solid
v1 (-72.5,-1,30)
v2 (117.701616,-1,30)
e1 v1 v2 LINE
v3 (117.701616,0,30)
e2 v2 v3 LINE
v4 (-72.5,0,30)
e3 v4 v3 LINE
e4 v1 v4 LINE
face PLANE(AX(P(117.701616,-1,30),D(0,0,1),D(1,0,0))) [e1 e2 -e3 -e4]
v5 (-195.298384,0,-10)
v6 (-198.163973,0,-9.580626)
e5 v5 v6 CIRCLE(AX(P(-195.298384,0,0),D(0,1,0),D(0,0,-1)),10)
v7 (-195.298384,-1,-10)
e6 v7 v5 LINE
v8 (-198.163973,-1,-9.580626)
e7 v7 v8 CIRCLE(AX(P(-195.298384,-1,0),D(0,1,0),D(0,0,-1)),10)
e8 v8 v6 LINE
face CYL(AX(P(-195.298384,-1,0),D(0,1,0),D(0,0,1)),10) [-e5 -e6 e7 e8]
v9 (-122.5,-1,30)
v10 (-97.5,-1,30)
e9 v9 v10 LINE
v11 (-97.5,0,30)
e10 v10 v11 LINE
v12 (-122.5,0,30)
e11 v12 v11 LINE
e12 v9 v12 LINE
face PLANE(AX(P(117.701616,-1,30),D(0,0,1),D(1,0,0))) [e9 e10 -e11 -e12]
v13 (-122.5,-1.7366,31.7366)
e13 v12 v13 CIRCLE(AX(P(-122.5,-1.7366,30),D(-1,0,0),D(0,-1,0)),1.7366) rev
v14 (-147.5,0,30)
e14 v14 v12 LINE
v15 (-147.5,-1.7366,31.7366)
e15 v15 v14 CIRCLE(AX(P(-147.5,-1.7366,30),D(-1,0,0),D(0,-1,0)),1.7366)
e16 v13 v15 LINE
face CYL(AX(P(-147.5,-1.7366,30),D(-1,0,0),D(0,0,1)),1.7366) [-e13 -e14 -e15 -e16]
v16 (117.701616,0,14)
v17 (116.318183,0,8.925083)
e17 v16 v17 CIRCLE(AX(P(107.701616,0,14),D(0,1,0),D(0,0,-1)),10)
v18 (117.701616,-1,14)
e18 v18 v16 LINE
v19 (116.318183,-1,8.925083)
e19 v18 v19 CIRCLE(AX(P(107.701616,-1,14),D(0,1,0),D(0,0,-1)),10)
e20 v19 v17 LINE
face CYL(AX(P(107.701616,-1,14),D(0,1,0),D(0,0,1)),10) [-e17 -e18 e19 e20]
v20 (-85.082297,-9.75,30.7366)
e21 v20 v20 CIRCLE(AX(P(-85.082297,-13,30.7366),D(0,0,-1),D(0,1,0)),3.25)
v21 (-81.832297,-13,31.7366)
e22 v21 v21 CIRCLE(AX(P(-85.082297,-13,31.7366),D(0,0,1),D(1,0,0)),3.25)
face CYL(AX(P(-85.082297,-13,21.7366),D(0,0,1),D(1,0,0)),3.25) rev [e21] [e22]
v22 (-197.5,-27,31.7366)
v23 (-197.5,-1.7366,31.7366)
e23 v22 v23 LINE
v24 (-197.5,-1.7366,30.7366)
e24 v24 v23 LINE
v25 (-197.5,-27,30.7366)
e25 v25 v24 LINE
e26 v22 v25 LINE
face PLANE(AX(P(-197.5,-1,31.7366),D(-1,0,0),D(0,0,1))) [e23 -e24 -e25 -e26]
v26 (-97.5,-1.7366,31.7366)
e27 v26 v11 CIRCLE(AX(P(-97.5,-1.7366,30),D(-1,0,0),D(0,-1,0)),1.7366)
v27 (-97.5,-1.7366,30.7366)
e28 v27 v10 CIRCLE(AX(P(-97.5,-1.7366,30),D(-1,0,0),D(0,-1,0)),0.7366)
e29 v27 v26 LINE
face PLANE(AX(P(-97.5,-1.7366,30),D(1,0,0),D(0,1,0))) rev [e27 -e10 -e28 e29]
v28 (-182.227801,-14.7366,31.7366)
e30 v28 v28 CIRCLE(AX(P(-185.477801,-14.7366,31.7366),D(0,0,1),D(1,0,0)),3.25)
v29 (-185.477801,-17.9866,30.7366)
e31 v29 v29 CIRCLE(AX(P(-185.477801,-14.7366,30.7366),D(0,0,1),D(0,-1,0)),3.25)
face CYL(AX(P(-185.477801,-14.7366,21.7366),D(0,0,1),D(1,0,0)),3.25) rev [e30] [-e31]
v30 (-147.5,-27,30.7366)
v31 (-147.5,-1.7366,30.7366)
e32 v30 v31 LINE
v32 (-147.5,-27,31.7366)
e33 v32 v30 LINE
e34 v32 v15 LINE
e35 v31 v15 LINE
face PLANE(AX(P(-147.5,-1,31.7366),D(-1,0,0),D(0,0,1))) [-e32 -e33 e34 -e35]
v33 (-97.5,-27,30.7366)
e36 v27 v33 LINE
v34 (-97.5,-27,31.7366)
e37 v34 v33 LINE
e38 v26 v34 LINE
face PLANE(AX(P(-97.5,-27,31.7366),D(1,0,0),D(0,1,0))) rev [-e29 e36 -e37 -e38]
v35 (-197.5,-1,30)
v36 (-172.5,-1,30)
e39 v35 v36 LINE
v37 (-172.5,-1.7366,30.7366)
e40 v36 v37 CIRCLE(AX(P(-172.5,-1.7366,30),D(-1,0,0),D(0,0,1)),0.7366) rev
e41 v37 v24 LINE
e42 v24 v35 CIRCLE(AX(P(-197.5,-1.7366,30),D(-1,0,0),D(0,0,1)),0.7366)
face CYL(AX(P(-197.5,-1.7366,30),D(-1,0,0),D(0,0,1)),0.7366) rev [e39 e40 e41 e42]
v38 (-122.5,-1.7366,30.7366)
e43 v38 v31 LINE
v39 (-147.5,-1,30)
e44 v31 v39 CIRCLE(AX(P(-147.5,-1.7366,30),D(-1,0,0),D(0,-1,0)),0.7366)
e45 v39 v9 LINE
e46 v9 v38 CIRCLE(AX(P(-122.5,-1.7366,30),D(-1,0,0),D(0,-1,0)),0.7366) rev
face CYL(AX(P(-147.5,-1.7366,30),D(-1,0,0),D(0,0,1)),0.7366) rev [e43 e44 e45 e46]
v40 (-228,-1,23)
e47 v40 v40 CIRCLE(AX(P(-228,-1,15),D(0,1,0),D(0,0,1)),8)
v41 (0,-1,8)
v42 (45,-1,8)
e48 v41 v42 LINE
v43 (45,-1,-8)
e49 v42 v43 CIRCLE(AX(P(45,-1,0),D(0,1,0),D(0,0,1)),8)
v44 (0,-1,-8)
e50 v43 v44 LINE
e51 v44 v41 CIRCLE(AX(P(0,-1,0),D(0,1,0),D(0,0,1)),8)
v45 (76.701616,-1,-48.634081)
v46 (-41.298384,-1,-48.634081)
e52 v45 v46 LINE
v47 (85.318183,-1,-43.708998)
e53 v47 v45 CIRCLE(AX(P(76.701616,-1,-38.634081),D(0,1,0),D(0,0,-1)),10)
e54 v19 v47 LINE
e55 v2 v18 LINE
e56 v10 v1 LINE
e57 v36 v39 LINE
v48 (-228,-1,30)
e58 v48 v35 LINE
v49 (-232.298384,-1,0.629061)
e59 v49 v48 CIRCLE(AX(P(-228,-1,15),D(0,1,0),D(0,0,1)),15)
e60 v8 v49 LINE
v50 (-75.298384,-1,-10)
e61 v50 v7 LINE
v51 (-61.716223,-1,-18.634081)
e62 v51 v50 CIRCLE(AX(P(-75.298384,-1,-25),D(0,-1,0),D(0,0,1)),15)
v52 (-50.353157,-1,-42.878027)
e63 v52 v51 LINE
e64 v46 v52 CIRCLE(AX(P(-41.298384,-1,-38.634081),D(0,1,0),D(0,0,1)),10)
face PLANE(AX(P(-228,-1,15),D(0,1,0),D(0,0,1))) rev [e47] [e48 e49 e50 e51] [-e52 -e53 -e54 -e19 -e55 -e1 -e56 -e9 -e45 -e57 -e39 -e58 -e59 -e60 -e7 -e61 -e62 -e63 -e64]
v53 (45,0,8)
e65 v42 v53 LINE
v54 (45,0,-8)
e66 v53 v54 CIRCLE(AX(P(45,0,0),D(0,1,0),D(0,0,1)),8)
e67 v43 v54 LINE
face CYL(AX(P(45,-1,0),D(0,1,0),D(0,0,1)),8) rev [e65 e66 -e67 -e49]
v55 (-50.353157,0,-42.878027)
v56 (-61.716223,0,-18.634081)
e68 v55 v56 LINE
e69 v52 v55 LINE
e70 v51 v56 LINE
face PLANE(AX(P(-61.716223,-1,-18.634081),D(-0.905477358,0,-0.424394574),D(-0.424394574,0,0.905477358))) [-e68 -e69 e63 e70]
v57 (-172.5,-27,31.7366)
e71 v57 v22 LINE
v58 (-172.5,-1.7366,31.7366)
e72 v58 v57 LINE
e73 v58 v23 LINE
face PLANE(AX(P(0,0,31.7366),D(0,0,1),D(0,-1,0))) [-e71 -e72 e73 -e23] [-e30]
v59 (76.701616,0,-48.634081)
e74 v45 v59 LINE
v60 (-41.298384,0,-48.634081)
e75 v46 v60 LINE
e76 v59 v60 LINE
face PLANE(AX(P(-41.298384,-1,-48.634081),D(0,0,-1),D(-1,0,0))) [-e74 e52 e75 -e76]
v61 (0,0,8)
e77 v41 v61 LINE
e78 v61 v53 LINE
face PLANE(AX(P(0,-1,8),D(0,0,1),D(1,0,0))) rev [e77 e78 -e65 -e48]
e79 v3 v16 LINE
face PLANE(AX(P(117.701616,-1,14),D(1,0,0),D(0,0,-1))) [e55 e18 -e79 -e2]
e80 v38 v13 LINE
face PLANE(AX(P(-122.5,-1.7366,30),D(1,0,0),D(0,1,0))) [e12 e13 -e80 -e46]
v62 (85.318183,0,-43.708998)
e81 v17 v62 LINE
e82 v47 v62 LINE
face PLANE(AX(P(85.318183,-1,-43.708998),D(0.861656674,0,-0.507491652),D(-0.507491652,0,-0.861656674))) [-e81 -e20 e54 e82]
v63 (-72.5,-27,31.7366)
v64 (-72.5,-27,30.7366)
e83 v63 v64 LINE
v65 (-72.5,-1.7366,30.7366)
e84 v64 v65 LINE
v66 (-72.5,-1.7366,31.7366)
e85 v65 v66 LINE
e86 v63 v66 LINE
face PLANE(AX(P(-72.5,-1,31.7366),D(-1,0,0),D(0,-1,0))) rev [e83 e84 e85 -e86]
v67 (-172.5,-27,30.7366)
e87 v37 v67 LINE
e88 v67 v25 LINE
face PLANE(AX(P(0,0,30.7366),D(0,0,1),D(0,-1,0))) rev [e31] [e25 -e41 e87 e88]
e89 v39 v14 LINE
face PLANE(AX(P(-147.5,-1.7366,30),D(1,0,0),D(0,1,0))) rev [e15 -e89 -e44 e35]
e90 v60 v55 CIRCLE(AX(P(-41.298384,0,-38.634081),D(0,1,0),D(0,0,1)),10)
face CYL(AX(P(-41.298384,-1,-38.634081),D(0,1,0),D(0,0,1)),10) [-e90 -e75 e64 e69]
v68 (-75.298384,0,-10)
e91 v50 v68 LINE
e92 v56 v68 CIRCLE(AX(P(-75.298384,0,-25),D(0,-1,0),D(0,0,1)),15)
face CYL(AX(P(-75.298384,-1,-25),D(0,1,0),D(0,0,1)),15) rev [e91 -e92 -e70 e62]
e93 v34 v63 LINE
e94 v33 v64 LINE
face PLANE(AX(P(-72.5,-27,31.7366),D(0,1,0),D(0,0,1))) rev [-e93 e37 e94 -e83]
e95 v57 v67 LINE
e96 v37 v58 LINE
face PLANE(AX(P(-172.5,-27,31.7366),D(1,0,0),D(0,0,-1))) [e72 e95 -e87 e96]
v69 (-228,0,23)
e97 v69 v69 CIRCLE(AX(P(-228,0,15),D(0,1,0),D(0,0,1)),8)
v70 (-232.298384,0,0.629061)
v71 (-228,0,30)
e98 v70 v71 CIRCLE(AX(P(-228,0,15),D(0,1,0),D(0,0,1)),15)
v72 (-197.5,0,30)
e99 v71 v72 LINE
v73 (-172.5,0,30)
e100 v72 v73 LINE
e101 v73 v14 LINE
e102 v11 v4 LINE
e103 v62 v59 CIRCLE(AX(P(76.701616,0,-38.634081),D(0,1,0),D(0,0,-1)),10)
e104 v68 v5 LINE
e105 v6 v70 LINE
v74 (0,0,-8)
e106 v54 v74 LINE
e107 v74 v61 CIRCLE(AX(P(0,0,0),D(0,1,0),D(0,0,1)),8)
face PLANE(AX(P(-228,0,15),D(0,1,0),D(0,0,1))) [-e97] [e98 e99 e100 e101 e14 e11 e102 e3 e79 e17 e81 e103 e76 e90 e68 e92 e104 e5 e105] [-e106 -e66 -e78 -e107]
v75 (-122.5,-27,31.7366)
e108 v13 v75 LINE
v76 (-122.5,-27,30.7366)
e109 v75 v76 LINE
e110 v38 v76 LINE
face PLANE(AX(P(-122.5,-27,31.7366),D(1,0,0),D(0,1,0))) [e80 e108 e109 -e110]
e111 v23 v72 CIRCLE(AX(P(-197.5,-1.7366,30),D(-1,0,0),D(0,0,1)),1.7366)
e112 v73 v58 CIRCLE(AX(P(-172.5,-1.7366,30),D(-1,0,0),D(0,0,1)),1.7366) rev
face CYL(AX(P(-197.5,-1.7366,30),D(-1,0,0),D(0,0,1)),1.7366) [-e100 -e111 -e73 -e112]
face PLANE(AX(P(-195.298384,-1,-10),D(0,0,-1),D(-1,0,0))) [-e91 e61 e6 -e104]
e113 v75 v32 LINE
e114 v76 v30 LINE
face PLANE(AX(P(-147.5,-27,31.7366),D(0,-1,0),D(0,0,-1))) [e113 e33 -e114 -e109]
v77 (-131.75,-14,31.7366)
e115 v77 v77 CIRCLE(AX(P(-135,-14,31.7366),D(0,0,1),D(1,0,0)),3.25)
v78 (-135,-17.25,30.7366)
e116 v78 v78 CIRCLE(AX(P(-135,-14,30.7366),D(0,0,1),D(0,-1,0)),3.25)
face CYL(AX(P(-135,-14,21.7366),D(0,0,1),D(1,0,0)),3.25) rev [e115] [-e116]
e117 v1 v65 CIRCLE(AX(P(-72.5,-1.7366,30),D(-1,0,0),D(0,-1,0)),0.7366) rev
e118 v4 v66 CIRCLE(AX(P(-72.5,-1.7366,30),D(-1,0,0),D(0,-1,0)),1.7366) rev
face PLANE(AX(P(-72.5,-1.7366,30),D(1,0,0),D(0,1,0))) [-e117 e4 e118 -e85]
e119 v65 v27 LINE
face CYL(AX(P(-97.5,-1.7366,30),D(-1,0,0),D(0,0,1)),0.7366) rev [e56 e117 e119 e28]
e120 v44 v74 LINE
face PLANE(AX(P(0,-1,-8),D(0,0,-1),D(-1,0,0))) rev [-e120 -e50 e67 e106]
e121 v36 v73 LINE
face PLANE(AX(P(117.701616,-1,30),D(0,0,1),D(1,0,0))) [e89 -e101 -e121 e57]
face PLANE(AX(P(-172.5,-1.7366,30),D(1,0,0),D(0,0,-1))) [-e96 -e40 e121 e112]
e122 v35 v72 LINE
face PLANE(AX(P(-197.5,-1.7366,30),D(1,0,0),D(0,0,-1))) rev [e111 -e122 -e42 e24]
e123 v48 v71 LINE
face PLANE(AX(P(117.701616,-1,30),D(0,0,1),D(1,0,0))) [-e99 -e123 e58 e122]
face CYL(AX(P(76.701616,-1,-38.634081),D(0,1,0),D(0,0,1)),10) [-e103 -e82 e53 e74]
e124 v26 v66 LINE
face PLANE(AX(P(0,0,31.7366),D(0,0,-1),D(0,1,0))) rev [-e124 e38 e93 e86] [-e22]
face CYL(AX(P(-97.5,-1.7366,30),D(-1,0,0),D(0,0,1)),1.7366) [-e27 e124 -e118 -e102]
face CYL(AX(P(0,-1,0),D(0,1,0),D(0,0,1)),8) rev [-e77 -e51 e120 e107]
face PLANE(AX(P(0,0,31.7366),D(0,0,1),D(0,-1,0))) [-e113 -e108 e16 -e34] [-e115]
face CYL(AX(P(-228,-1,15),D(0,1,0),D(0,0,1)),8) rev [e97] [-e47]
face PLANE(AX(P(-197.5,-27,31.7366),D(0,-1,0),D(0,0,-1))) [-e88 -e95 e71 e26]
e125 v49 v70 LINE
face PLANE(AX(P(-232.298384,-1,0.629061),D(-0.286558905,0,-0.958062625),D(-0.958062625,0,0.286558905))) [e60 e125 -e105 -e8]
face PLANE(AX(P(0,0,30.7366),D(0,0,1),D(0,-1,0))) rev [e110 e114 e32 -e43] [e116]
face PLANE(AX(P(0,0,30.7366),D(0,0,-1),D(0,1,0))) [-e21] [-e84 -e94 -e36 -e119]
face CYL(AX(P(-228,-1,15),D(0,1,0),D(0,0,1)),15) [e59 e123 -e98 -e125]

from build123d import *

# Parameters (mm, degrees)
SKETCH2_R          = 8
BASE_FLANGE1_DEPTH = 1
EDGE_FLANGE5_DEPTH = 25
EDGE_FLANGE6_DEPTH = 25
EDGE_FLANGE7_DEPTH = 25
SKETCH29_R         = 3.25
CUT_EXTRUDE2_DEPTH = 10


# Sheet-metal steps are written as plain solids
with BuildPart() as part:
    # Sketch2 → Base-Flange1 (new body)
    with BuildSketch(Plane(origin=(0, 0, 0), x_dir=(1, 0, 0), z_dir=(0, 1, 0))):
        with BuildLine():
            Line((-41.298383568, 48.634081388), (76.701616432, 48.634081388))
            ThreePointArc((76.701616432, 48.634081388), (81.664016801, 47.315935025), (85.318183171, 43.708997903))
            Line((85.318183171, 43.708997903), (116.318183171, -8.925083485))
            ThreePointArc((116.318183171, -8.925083485), (117.349560964, -11.369949372), (117.701616432, -14))
            Line((117.701616432, -14), (117.701616432, -30))
            Line((117.701616432, -30), (-228, -30))
            ThreePointArc((-228, -30), (-242.841901676, -17.172085321), (-232.298383568, -0.629060619))
            Line((-232.298383568, -0.629060619), (-198.163972613, 9.580626254))
            ThreePointArc((-198.163972613, 9.580626254), (-196.746440448, 9.894601117), (-195.298383568, 10))
            Line((-195.298383568, 10), (-75.298383568, 10))
            ThreePointArc((-75.298383568, 10), (-67.251296492, 12.341232699), (-61.716223201, 18.634081388))
            Line((-61.716223201, 18.634081388), (-50.353157146, 42.878027129))
            ThreePointArc((-50.353157146, 42.878027129), (-46.663108285, 47.073259589), (-41.298383568, 48.634081388))
        make_face()
        with Locations(Location((-228, -15, 0), (0, 0, 270))):
            Circle(SKETCH2_R, mode=Mode.SUBTRACT)
        with BuildLine():
            Line((0, 8), (45, 8))
            ThreePointArc((45, 8), (53, 0), (45, -8))
            Line((45, -8), (0, -8))
            ThreePointArc((0, -8), (-8, 0), (0, 8))
        make_face(mode=Mode.SUBTRACT)
    extrude(amount=-BASE_FLANGE1_DEPTH)

    # Edge-Flange5 section (across the edge) → Edge-Flange5 (add)
    with BuildSketch(Plane(origin=(-172.5, -1, 30.7366), x_dir=(0, 0, -1), z_dir=(-1, 0, 0))):
        with BuildLine():
            Line((-1, 0.7366), (-1, 26))
            Line((-1, 26), (0, 26))
            Line((0, 26), (0, 0.7366))
            ThreePointArc((0, 0.7366), (0.215745145, 0.215745145), (0.7366, 0))
            Line((0.7366, 0), (0.7366, -1))
            ThreePointArc((0.7366, -1), (-0.491361636, -0.491361636), (-1, 0.7366))
        make_face()
    extrude(amount=EDGE_FLANGE5_DEPTH)

    # Edge-Flange6 section (across the edge) → Edge-Flange6 (add)
    with BuildSketch(Plane(origin=(-122.5, -1, 30.7366), x_dir=(0, 0, -1), z_dir=(-1, 0, 0))):
        with BuildLine():
            Line((-1, 0.7366), (-1, 26))
            Line((-1, 26), (0, 26))
            Line((0, 26), (0, 0.7366))
            ThreePointArc((0, 0.7366), (0.215745145, 0.215745145), (0.7366, 0))
            Line((0.7366, 0), (0.7366, -1))
            ThreePointArc((0.7366, -1), (-0.491361636, -0.491361636), (-1, 0.7366))
        make_face()
    extrude(amount=EDGE_FLANGE6_DEPTH)

    # Edge-Flange7 section (across the edge) → Edge-Flange7 (add)
    with BuildSketch(Plane(origin=(-72.5, -1, 30.7366), x_dir=(0, 0, -1), z_dir=(-1, 0, 0))):
        with BuildLine():
            Line((-1, 0.7366), (-1, 26))
            Line((-1, 26), (0, 26))
            Line((0, 26), (0, 0.7366))
            ThreePointArc((0, 0.7366), (0.215745145, 0.215745145), (0.7366, 0))
            Line((0.7366, 0), (0.7366, -1))
            ThreePointArc((0.7366, -1), (-0.491361636, -0.491361636), (-1, 0.7366))
        make_face()
    extrude(amount=EDGE_FLANGE7_DEPTH)

    # Sketch29 → Cut-Extrude2 (cut)
    with BuildSketch(Plane.XY.offset(31.7366)):
        with Locations((-85.082297009, -13)):
            Circle(SKETCH29_R)
        with Locations((-135, -14)):
            Circle(SKETCH29_R)
        with Locations((-185.477801268, -14.7366)):
            Circle(SKETCH29_R)
    extrude(amount=-CUT_EXTRUDE2_DEPTH, mode=Mode.SUBTRACT)


solid = part.part
